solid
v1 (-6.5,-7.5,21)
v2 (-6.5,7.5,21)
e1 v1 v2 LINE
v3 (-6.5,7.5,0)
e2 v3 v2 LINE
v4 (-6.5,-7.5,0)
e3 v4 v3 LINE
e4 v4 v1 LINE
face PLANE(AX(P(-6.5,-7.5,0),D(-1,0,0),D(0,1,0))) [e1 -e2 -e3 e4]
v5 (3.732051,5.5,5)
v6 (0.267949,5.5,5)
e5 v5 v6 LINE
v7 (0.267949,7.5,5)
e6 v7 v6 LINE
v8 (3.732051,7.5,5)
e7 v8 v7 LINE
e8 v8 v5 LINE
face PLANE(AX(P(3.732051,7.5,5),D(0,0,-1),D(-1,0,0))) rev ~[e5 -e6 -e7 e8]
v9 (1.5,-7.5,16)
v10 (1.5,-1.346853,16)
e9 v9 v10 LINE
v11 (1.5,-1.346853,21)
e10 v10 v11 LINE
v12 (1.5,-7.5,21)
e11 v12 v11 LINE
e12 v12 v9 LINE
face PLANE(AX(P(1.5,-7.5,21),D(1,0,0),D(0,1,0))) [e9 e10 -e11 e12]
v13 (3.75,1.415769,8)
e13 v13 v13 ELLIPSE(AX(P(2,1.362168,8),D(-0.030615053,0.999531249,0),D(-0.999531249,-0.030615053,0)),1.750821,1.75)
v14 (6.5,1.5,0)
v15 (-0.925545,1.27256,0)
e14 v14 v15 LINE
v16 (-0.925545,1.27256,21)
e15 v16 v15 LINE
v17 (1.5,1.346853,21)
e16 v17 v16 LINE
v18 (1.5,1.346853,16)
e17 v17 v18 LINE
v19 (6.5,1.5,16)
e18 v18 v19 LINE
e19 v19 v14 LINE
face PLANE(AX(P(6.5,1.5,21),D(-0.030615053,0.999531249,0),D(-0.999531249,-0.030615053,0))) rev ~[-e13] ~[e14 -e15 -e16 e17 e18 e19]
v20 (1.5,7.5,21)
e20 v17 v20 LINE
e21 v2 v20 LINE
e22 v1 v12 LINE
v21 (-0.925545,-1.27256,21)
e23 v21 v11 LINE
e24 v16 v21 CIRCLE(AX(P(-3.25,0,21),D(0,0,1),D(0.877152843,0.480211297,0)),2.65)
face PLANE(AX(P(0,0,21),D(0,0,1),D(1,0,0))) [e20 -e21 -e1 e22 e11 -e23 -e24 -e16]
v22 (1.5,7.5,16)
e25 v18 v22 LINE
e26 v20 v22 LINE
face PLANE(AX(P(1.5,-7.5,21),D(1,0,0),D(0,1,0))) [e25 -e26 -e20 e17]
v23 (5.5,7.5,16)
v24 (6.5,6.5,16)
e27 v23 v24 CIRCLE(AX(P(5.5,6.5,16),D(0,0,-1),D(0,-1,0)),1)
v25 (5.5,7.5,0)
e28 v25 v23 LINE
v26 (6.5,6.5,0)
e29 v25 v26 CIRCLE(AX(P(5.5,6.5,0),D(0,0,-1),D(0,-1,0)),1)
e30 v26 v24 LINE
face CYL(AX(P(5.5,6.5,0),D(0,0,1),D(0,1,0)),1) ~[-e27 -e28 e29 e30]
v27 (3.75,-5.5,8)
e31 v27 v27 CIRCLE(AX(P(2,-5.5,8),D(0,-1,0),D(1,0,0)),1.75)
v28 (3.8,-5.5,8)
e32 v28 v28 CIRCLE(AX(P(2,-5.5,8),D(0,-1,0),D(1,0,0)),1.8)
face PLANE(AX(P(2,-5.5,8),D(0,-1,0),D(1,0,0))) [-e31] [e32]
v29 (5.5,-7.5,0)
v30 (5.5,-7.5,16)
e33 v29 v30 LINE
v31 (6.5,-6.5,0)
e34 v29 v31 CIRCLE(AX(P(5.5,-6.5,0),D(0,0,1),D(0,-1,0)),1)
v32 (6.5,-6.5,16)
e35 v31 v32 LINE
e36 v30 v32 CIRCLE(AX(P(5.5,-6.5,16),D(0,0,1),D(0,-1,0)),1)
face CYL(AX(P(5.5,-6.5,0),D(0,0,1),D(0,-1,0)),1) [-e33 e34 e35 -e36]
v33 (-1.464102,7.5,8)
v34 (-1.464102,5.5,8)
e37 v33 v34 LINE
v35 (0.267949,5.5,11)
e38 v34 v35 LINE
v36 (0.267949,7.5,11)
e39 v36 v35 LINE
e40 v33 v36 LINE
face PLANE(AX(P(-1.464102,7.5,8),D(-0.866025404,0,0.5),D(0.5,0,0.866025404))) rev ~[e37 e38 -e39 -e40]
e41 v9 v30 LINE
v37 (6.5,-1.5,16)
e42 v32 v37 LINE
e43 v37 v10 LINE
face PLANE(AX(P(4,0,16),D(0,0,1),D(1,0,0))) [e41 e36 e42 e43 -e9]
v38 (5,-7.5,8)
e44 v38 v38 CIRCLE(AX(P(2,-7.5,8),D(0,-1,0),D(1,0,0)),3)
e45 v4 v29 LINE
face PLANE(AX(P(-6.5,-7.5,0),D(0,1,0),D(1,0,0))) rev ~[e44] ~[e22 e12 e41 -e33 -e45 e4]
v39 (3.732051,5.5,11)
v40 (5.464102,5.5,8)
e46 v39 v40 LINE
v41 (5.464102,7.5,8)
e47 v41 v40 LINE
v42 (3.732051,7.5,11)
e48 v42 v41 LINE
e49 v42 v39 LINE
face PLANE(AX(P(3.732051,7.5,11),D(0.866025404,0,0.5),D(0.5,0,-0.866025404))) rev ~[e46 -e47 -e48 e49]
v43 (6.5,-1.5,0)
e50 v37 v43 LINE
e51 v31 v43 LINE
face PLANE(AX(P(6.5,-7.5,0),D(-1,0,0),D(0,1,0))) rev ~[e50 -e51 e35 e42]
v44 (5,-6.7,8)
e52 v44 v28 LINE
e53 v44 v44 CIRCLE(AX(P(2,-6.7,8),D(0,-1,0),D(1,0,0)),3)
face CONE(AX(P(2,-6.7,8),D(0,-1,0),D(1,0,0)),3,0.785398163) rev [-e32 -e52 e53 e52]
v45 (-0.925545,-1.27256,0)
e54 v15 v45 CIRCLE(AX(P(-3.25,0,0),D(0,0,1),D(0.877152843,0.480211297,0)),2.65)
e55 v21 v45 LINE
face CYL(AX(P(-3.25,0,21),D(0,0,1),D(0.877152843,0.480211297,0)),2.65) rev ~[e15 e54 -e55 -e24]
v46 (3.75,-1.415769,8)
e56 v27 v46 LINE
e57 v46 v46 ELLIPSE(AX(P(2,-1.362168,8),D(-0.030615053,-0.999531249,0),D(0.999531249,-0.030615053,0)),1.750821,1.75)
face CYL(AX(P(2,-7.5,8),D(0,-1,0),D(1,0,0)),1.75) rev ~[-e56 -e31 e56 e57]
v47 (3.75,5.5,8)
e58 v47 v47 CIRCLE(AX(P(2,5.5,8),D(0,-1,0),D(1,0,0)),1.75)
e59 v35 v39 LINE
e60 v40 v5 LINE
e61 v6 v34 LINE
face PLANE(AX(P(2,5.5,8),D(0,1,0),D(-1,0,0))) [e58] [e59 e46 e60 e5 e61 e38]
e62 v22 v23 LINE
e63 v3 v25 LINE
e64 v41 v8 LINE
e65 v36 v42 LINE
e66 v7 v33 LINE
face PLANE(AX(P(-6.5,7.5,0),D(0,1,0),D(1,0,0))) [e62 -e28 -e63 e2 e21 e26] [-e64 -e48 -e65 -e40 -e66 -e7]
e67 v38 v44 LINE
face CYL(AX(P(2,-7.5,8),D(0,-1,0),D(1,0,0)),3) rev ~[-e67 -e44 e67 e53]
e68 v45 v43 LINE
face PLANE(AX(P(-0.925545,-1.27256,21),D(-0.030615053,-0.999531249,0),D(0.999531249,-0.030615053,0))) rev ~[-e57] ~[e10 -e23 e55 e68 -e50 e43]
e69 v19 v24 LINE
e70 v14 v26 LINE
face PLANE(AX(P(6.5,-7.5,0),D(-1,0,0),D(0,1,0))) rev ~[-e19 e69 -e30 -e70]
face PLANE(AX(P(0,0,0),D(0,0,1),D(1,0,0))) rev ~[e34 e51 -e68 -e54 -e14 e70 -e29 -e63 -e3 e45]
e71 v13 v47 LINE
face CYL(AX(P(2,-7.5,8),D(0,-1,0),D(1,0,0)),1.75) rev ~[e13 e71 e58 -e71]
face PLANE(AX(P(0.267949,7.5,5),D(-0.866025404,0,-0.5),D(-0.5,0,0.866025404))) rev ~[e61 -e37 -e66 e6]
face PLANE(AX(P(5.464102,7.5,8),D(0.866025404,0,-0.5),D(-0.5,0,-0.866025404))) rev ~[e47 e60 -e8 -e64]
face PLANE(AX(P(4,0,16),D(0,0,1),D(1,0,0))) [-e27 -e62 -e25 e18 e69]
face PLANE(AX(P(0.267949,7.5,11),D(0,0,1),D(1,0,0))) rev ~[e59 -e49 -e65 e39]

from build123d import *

# Parameters (mm, degrees)
F0_W      = 13
F0_H      = 15
F1_DEPTH  = 21
F3_DEPTH  = 21
F4_W      = 5
F4_H      = 15
F5_DEPTH  = 5
F6_R      = 1.75
F7_DEPTH  = 42
F8_R      = 1.75
F9_DEPTH  = 2
F10_R     = 3
F10_R_2   = 1.75
F11_DEPTH = 2
F12_SIZE  = 1.2
F13_R     = 1


# Not quite as in the source:
# - an extrude ends at something that could not be found from the text; its depth is read off the source's solid


with BuildPart() as f1:
    # F0 (on Top) → F1 (new body)
    with BuildSketch(Plane.XY):
        Rectangle(F0_W, F0_H)
    extrude(amount=F1_DEPTH)

    # F2 (on face) → F3 (cut, through all)
    with BuildSketch(Plane.XY.offset(21)):
        with BuildLine():
            ThreePointArc((-0.9255449651, -1.272559936), (-0.682675922, -0.6567701872), (-0.6, 0))
            ThreePointArc((-0.6, 0), (-0.682675922, 0.6567701872), (-0.9255449651, 1.272559936))
            Line((-0.9255449651, 1.272559936), (-0.9255449651, -1.272559936))
        make_face()
        with BuildLine():
            ThreePointArc((-0.9255449651, 1.272559936), (-0.682675922, 0.6567701872), (-0.6, 0))
            ThreePointArc((-0.6, 0), (-0.682675922, -0.6567701872), (-0.9255449651, -1.272559936))
            Line((-0.9255449651, -1.272559936), (6.5, -1.5))
            Line((6.5, -1.5), (6.5, 1.5))
            Line((6.5, 1.5), (-0.9255449651, 1.272559936))
        make_face()
        with BuildLine():
            Line((-0.9255449651, -1.272559936), (-0.9255449651, 1.272559936))
            ThreePointArc((-0.9255449651, 1.272559936), (-5.9, 0), (-0.9255449651, -1.272559936))
        make_face()
    extrude(amount=-F3_DEPTH, mode=Mode.SUBTRACT)

    # F4 (on face) → F5 (cut)
    with BuildSketch(Plane.XY.offset(21)):
        with Locations((4, 0)):
            Rectangle(F4_W, F4_H)
    extrude(amount=-F5_DEPTH, mode=Mode.SUBTRACT)

    # F6 (on face) → F7 (cut, through all)
    with BuildSketch(Plane.XZ.offset(7.5)):
        with Locations((2, 8)):
            Circle(F6_R)
    extrude(amount=-F7_DEPTH, mode=Mode.SUBTRACT)

    # F8 (on face) → F9 (cut)
    with BuildSketch(Plane(origin=(0, 7.5, 0), x_dir=(-1, 0, 0), z_dir=(0, 1, 0))):
        Polygon((-0.2679491924, 11), (-3.7320508076, 11), (-5.4641016151, 8), (-3.7320508076, 5), (-0.2679491924, 5), (1.4641016151, 8), align=None)
        with Locations((-2, 8)):
            Circle(F8_R, mode=Mode.SUBTRACT)
    extrude(amount=-F9_DEPTH, mode=Mode.SUBTRACT)

    # F10 (on face) → F11 (cut)
    with BuildSketch(Plane.XZ.offset(7.5)):
        with Locations((2, 8)):
            Circle(F10_R)
        with Locations((2, 8)):
            Circle(F10_R_2, mode=Mode.SUBTRACT)
    extrude(amount=-F11_DEPTH, mode=Mode.SUBTRACT)

    # F12
    f12_edges = [f1.edges().sort_by_distance(p)[0] for p in [
        (-1, -5.5, 8),
    ]]
    chamfer(f12_edges, length=F12_SIZE)

    # F13
    f13_edges = [f1.edges().sort_by_distance(p)[0] for p in [
        (6.5, -7.5, 8),
        (6.5, 7.5, 8),
    ]]
    fillet(f13_edges, radius=F13_R)


solid = f1.part
